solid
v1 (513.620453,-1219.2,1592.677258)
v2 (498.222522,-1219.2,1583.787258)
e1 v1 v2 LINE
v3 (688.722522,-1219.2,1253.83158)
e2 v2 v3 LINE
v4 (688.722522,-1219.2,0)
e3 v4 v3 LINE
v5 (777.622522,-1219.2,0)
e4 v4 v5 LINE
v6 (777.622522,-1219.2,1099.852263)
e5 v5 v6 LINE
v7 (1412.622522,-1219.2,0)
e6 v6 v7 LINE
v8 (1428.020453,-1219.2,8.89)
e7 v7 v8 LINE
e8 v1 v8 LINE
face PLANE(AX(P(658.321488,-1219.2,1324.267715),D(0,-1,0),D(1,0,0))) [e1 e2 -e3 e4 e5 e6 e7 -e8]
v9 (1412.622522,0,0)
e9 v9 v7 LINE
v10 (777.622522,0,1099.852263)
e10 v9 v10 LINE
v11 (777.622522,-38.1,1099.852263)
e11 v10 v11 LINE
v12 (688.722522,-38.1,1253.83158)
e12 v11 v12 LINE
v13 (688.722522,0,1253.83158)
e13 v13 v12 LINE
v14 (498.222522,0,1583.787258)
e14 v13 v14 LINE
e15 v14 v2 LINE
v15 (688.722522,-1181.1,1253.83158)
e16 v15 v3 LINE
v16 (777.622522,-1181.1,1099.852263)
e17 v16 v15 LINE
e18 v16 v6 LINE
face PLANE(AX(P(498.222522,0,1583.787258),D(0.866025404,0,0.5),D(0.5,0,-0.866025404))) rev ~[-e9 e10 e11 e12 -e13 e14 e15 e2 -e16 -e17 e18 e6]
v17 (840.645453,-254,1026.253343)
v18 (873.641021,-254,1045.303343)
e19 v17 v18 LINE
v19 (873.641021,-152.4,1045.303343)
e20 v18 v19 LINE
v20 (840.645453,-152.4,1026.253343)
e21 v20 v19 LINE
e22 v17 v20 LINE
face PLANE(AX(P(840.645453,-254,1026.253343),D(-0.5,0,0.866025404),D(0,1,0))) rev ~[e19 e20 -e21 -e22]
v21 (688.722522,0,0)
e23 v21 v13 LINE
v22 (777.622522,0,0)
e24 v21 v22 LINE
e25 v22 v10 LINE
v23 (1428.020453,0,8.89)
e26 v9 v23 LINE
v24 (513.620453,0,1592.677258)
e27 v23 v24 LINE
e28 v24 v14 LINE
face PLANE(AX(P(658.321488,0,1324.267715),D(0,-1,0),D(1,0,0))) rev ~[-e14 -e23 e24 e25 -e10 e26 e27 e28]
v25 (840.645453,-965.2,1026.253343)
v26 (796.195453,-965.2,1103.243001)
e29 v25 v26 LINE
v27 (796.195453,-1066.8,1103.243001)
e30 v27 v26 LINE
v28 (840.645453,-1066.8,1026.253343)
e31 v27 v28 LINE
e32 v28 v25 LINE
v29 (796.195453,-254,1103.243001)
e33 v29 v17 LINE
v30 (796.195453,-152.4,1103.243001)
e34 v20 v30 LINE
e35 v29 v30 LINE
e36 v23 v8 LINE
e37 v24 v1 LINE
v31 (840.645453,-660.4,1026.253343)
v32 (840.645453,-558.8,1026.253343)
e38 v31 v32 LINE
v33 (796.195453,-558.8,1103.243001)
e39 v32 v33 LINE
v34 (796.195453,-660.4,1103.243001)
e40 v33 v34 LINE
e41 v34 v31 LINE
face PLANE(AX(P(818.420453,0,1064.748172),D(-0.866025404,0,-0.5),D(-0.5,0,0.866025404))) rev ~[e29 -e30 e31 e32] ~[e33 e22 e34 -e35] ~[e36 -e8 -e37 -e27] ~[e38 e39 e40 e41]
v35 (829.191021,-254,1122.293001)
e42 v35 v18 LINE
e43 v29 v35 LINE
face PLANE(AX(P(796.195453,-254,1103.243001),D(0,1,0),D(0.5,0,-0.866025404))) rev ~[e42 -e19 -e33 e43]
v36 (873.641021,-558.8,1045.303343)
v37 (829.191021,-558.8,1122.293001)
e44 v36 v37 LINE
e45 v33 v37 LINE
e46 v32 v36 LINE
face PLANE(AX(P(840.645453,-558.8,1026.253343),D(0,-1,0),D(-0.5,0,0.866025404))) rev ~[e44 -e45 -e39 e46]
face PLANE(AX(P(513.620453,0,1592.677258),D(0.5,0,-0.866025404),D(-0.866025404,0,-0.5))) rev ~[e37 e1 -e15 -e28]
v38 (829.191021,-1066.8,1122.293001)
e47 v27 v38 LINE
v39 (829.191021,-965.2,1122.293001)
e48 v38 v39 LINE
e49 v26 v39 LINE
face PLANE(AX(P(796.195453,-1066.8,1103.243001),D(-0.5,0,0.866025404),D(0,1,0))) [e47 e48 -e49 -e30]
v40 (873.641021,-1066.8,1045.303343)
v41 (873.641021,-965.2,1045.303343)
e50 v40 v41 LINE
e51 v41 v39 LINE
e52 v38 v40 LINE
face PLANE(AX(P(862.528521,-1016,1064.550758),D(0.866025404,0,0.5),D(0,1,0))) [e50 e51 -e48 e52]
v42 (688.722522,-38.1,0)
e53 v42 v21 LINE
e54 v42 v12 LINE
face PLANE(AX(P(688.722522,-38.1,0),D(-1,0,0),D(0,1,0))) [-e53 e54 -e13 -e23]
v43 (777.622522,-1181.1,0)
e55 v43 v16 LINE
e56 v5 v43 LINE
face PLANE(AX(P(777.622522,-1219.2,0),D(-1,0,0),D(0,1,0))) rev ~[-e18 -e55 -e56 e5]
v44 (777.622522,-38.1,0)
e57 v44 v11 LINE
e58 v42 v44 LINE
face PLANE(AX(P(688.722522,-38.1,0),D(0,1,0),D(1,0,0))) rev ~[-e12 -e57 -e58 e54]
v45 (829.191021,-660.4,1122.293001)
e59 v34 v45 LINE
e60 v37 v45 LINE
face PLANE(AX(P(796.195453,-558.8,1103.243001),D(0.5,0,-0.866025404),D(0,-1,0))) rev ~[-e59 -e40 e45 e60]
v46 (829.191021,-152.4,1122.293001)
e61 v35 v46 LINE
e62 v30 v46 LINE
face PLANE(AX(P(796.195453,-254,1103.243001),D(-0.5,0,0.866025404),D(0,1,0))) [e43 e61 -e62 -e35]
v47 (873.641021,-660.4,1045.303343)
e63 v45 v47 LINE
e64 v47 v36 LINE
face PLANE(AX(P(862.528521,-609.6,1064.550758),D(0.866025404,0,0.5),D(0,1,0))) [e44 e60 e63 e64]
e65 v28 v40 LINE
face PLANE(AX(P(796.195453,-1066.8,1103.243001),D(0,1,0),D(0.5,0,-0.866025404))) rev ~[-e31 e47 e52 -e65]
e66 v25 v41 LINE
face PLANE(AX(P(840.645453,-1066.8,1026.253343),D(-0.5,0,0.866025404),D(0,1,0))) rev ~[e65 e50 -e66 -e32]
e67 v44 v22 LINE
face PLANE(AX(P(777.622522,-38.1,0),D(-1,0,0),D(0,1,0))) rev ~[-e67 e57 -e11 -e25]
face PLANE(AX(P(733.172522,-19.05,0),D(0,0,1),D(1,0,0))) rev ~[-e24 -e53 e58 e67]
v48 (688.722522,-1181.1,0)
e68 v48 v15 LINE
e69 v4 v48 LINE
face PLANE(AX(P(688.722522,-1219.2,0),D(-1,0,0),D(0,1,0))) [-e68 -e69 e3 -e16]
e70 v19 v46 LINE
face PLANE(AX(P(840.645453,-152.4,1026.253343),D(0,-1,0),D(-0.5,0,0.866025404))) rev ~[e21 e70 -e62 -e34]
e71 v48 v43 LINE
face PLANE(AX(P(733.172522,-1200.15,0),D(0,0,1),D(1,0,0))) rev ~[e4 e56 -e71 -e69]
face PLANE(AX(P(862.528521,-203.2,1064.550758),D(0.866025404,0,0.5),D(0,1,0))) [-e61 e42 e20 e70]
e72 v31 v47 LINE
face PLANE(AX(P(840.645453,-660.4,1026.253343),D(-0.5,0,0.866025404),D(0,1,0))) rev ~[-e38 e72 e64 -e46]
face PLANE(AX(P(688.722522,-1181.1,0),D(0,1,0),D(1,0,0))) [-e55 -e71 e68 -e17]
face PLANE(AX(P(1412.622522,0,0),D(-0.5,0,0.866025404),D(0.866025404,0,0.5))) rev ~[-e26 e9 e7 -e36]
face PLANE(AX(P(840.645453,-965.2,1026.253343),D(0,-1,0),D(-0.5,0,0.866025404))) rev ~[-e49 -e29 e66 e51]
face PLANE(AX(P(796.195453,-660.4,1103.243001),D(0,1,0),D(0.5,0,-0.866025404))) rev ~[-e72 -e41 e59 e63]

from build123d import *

# Parameters (mm, degrees)
F1_DEPTH = 1219.2
F2_DEPTH = 1219.2
F3_W     = 88.9
F3_H     = 38.1
F6_W     = 101.6
F6_H     = 44.45
F6_W_2   = 50.8
F7_DEPTH = 38.1


# Not quite as in the source:
# - a feature of the source that left no trace in its solid (it failed there, or was rolled back) is left out


with BuildPart() as f1:
    # F0 (on Front) → F1 (new body)
    with BuildSketch(Plane.XZ):
        Polygon((1412.622521745, 0), (1428.0204534243, 8.89), (818.4204534243, 1064.748172294), (803.022521745, 1055.858172294), align=None)
    extrude(amount=F1_DEPTH)

    # F0 (on Front) → F2 (join, through all)
    with BuildSketch(Plane.XZ):
        Polygon((803.022521745, 1055.858172294), (818.4204534243, 1064.748172294), (513.6204534243, 1592.677258441), (498.222521745, 1583.787258441), align=None)
    extrude(amount=F2_DEPTH)

    # F3 (on Top) → F5 (join, up to the next surface of F1)
    with BuildSketch(Plane.XY):
        with Locations((733.172521745, -19.05)):
            Rectangle(F3_W, F3_H)
        with Locations((733.172521745, -1200.15)):
            Rectangle(F3_W, F3_H)
    extrude(until=Until.NEXT)

    # F6 (on face) → F7 (join)
    with BuildSketch(Plane(origin=(1074.864822988, 0, 620.5734948946), x_dir=(0, 1, 0), z_dir=(0.8660254038, 0, 0.5))):
        with Locations((-203.2, 490.6637391275)):
            Rectangle(F6_W, F6_H)
        with Locations((-203.2, 535.1137391275)):
            Rectangle(F6_W, F6_H)
        with Locations((-1016, 490.6637391275)):
            Rectangle(F6_W, F6_H)
        with Locations((-1016, 535.1137391275)):
            Rectangle(F6_W, F6_H)
        Polygon((-558.8, 468.4387391275), (-558.8, 512.8887391275), (-609.6, 512.8887391275), (-660.4, 512.8887391275), (-660.4, 468.4387391275), align=None)
        with Locations((-584.2, 535.1137391275)):
            Rectangle(F6_W_2, F6_H)
        with Locations((-635, 535.1137391275)):
            Rectangle(F6_W_2, F6_H)
    extrude(amount=F7_DEPTH)


solid = f1.part
